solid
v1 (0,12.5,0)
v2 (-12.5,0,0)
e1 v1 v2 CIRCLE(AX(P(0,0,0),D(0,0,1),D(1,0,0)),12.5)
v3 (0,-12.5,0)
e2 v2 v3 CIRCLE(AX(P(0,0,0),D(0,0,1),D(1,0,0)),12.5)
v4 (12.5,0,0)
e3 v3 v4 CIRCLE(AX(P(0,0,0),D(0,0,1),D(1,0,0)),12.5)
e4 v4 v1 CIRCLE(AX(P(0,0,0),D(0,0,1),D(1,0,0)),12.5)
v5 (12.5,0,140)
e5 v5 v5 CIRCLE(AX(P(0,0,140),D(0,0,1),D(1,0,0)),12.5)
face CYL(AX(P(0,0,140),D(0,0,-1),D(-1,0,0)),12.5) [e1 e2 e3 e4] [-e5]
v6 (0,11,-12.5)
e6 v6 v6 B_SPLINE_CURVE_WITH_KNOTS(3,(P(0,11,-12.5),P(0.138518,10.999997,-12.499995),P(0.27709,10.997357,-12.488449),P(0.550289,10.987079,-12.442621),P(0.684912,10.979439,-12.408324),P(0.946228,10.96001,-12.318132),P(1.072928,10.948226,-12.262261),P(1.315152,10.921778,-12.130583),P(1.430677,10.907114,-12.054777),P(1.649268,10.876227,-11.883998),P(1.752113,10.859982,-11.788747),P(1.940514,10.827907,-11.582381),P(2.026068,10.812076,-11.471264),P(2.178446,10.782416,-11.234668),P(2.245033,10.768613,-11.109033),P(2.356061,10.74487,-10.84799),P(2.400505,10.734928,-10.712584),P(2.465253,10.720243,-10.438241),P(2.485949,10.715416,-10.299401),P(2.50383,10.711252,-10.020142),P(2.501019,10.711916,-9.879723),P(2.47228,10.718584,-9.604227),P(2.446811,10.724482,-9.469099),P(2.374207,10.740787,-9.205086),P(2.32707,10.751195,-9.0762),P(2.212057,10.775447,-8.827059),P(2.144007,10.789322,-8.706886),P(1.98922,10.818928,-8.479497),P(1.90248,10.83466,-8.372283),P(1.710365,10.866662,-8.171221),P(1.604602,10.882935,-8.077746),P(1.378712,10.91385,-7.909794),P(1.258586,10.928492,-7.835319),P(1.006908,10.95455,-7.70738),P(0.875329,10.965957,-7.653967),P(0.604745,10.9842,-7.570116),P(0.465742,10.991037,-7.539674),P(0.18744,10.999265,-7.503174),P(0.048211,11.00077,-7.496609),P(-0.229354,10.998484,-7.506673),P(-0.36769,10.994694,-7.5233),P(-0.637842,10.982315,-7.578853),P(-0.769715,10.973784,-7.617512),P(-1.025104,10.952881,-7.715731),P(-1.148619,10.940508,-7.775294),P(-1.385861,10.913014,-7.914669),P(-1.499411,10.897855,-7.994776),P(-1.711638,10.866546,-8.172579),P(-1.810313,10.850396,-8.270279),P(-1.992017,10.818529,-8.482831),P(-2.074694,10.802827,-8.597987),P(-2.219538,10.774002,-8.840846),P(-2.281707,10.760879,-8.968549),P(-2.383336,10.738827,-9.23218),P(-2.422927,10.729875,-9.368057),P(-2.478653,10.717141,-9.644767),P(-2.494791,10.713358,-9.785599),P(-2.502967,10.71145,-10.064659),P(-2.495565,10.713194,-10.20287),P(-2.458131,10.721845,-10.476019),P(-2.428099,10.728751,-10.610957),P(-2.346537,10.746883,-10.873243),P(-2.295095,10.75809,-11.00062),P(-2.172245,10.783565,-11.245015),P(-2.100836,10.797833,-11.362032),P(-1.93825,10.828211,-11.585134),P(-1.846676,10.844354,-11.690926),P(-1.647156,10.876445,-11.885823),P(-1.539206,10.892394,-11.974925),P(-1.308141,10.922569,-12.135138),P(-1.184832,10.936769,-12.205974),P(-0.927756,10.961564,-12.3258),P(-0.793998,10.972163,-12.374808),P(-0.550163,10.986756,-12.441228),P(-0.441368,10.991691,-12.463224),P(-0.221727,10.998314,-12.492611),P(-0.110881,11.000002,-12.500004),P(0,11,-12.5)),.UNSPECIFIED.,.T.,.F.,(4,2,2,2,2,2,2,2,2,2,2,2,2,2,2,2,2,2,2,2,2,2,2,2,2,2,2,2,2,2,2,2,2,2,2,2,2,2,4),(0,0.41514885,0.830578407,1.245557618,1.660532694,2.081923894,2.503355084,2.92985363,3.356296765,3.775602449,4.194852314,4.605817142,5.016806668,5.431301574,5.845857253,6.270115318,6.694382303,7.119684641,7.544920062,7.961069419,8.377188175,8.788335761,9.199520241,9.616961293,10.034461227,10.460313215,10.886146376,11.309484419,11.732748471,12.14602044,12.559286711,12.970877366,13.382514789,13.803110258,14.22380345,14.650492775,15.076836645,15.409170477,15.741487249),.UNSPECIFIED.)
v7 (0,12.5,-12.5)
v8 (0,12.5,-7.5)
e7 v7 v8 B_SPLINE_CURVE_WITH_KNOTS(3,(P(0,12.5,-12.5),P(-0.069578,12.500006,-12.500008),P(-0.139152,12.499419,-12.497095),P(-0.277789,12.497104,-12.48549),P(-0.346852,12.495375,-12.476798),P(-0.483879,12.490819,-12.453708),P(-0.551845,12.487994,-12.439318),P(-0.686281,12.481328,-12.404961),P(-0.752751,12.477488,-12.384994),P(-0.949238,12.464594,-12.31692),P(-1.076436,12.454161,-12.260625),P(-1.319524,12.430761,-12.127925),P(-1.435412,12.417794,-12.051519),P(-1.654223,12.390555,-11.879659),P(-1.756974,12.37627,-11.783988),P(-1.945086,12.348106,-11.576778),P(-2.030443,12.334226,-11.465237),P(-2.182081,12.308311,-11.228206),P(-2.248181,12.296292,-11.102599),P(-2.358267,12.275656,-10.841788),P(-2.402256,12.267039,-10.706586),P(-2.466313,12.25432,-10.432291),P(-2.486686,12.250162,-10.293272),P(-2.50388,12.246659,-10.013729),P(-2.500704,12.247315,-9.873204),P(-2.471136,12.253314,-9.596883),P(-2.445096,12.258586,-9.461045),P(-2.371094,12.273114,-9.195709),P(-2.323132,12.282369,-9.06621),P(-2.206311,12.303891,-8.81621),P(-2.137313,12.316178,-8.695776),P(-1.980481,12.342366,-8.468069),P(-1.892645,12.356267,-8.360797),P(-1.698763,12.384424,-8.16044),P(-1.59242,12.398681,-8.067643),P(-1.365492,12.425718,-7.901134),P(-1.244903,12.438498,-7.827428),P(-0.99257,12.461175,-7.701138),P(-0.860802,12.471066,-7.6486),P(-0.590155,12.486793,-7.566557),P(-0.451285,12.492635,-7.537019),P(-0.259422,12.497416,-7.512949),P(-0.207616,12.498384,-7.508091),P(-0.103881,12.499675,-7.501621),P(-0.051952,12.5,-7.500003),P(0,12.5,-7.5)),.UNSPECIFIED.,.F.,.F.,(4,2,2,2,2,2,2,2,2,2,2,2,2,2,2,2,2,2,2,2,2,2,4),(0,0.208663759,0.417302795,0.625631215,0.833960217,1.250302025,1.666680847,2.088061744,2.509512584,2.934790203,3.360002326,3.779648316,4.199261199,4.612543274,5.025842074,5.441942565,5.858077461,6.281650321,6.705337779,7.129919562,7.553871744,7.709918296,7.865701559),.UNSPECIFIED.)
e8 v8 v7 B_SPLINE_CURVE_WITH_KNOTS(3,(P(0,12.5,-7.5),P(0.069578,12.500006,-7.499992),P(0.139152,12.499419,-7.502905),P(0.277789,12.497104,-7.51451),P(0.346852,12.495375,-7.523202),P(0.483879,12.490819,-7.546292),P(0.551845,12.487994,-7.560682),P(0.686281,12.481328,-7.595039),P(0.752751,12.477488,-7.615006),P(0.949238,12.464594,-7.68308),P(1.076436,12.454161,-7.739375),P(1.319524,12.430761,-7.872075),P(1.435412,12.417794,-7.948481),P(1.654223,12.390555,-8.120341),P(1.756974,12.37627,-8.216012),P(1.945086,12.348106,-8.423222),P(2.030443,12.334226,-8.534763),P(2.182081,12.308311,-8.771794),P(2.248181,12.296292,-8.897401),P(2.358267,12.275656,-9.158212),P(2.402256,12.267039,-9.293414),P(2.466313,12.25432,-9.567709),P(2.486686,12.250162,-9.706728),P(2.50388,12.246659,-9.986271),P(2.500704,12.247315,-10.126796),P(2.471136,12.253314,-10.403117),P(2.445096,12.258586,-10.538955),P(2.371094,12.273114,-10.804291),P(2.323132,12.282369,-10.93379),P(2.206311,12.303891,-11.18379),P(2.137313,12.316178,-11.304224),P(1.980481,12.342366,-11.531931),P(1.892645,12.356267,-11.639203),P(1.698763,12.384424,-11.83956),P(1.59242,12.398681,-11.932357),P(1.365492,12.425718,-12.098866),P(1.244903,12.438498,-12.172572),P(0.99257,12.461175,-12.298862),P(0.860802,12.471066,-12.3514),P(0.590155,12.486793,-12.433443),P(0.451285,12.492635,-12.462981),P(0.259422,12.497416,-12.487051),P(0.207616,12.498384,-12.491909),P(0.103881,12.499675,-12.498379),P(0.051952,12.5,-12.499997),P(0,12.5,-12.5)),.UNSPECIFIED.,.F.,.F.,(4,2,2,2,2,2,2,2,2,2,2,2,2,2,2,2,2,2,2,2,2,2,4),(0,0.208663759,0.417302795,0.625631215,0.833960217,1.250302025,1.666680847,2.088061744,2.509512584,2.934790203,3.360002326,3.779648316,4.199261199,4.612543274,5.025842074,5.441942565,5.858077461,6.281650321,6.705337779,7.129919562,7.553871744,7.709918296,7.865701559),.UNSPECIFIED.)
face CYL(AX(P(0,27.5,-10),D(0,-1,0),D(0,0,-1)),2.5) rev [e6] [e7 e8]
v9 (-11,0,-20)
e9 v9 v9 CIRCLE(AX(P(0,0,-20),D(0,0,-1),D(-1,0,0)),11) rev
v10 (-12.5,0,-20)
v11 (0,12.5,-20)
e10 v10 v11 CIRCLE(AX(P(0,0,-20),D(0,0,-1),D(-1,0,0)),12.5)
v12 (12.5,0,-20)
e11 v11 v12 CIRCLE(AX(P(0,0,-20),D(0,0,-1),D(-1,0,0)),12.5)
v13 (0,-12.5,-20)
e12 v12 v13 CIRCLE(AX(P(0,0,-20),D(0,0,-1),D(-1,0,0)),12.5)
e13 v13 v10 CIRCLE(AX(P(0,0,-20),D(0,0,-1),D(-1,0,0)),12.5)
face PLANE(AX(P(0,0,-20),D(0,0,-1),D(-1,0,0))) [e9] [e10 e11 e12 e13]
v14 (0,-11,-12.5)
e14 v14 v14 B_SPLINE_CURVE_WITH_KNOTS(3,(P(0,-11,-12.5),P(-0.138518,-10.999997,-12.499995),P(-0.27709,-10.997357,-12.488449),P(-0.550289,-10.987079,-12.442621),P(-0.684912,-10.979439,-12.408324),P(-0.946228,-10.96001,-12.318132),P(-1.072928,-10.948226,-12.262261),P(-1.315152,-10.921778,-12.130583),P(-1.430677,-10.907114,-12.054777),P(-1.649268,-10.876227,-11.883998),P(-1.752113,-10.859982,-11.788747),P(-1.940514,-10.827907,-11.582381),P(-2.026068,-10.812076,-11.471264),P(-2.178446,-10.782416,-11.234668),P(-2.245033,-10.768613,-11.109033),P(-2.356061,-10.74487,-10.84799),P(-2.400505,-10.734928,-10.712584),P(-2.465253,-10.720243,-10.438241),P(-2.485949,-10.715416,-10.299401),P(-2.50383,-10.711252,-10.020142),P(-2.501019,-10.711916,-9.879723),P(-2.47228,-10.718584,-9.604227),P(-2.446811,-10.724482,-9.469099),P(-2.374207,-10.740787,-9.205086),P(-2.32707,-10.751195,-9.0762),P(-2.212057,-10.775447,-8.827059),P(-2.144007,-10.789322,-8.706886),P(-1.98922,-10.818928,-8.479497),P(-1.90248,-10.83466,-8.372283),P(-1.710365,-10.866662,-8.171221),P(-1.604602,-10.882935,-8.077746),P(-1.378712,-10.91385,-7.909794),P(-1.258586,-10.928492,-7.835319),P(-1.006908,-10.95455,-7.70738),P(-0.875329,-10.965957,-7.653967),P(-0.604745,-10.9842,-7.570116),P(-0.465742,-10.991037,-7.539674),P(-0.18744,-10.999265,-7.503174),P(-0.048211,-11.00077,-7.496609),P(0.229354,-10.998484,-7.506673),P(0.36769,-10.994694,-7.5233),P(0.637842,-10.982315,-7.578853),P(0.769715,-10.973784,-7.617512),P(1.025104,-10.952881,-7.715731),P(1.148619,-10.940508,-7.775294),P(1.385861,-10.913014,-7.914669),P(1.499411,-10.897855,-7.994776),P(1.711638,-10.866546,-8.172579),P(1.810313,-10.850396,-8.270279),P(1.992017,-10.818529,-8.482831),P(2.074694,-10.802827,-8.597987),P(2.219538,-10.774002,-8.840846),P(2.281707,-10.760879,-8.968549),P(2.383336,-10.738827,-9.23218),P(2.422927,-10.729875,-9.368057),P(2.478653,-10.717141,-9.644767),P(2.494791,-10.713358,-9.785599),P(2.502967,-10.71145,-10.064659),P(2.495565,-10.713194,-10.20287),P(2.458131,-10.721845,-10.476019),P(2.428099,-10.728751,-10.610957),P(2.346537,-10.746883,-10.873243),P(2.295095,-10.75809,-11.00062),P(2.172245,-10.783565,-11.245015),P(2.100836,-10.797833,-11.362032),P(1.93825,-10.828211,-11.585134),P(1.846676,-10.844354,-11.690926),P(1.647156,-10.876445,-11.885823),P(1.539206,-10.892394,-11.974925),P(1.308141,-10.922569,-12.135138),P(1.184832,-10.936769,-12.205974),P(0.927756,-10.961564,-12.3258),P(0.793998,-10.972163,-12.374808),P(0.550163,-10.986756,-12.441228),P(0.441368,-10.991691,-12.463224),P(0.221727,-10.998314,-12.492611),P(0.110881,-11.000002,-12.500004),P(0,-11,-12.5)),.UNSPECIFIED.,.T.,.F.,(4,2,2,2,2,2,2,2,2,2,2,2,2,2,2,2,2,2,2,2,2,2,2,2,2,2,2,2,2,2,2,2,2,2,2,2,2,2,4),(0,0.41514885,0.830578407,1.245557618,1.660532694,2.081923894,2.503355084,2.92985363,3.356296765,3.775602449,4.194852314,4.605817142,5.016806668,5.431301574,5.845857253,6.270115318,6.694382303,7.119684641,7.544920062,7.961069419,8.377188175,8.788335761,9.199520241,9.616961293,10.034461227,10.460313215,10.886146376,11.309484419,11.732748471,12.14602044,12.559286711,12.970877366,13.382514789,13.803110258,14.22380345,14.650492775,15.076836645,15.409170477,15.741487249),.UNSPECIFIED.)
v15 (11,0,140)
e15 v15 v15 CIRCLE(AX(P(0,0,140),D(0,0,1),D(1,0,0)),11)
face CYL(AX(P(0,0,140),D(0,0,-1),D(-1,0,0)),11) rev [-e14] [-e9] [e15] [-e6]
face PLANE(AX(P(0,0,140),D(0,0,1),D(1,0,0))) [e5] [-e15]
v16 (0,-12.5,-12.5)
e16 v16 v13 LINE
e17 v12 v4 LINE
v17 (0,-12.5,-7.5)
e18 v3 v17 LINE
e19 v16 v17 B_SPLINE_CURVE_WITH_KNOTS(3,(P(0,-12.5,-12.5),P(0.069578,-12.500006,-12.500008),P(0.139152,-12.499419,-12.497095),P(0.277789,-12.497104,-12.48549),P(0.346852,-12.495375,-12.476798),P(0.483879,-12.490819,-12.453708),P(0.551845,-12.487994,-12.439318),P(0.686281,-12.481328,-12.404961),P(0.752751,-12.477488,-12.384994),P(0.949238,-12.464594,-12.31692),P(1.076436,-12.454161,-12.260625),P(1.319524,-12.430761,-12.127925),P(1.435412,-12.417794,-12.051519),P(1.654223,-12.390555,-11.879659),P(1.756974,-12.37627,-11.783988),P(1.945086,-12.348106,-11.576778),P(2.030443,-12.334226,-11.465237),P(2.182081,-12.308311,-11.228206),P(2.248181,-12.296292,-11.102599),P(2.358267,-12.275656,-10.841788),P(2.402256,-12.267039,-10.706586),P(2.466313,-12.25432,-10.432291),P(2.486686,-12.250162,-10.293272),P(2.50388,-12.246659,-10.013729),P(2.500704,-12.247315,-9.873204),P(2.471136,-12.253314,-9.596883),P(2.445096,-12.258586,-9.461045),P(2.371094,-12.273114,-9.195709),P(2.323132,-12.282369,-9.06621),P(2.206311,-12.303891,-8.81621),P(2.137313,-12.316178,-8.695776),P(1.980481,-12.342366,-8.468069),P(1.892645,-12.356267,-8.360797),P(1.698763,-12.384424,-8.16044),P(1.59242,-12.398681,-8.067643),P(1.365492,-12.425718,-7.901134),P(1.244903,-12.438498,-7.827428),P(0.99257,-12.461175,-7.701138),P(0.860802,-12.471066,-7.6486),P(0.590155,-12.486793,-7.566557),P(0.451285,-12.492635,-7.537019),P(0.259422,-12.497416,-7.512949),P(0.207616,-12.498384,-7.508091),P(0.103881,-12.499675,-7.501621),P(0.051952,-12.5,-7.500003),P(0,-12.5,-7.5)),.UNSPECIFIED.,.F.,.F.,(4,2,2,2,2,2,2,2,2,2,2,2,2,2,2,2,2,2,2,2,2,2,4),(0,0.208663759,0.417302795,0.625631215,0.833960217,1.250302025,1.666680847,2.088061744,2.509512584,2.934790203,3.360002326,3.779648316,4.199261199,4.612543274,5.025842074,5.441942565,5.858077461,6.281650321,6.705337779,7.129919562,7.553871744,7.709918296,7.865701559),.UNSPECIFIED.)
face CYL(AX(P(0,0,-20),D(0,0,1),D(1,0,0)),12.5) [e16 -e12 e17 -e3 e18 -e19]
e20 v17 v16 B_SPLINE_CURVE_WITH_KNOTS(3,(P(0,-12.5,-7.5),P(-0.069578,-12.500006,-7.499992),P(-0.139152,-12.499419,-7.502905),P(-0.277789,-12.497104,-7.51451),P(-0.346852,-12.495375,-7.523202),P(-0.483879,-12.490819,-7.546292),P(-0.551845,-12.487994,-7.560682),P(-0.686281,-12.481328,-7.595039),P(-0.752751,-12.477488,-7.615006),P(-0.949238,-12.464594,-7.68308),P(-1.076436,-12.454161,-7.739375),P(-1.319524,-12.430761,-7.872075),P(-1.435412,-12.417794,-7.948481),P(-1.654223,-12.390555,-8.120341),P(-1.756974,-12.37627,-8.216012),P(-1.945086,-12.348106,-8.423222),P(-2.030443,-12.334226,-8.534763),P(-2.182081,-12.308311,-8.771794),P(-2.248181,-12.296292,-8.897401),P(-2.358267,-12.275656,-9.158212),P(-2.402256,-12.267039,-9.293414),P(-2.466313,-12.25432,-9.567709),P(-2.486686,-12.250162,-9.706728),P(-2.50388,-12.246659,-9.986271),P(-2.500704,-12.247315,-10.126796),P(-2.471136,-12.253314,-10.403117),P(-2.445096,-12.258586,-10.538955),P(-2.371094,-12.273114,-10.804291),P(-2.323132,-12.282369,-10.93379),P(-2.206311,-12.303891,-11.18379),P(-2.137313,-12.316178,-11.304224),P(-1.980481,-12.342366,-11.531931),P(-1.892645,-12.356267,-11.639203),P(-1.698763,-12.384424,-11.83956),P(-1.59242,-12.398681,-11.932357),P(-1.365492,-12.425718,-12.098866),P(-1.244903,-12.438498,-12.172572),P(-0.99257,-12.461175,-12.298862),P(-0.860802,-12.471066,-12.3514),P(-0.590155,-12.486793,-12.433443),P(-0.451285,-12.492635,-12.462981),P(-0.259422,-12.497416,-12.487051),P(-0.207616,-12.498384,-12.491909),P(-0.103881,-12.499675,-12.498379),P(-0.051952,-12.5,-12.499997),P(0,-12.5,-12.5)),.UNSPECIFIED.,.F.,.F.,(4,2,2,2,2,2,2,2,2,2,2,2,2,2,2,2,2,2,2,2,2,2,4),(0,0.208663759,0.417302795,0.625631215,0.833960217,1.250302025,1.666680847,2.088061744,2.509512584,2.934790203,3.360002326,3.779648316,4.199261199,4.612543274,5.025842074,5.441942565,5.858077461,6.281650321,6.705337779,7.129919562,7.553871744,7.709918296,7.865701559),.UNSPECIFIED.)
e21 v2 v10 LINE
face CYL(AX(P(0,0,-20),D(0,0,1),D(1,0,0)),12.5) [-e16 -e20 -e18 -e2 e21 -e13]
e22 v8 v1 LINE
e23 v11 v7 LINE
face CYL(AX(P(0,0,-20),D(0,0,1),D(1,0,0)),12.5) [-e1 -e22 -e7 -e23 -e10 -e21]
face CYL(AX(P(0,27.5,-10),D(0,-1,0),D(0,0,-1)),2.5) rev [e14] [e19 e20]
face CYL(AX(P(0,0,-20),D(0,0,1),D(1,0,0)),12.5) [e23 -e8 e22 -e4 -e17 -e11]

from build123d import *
from build123d.topology import SkipClean

# Parameters (mm, degrees)
ESBO_O1_R                = 12.5
ESBO_O1_R_2              = 11
RESSALTO_EXTRUS_O1_DEPTH = 140
RESSALTO_EXTRUS_O2_START = 20
ESBO_O2_R                = 12.5
ESBO_O2_R_2              = 11
RESSALTO_EXTRUS_O2_DEPTH = 20
ESBO_O3_R                = 2.5
CORTE_EXTRUS_O1_DEPTH    = 40
FILETE1_START            = -20
FILETE1_DEPTH            = 20


with BuildPart() as part:
    # Esboço1 → Ressalto-extrusão1 (new body)
    with BuildSketch(Plane.XY):
        Circle(ESBO_O1_R)
        Circle(ESBO_O1_R_2, mode=Mode.SUBTRACT)
    extrude(amount=RESSALTO_EXTRUS_O1_DEPTH)

    # Esboço2 → Ressalto-extrusão2 (add)
    # profile 1 of 5: a face of its own
    with SkipClean():  # the faces are left unmerged after this step: merging them gives an invalid solid
        with BuildSketch(Plane(origin=(0, 0, 0), x_dir=(-1, 0, 0), z_dir=(0, 0, -1)).offset(RESSALTO_EXTRUS_O2_START)):
            with BuildLine():
                Line((12.5, 12.5), (0, 12.5))
                ThreePointArc((0, 12.5), (8.838834765, 8.838834765), (12.5, 0))
                Line((12.5, 0), (12.5, 12.5))
            make_face()
        # profile 2 of 5: a face of its own
        with BuildSketch(Plane(origin=(0, 0, 0), x_dir=(-1, 0, 0), z_dir=(0, 0, -1)).offset(RESSALTO_EXTRUS_O2_START)):
            with BuildLine():
                Line((12.5, -12.5), (12.5, 0))
                ThreePointArc((12.5, 0), (8.838834747, -8.838834783), (-5.1e-08, -12.5))
                Line((-5.1e-08, -12.5), (12.5, -12.5))
            make_face()
        # profile 3 of 5: a face of its own
        with BuildSketch(Plane(origin=(0, 0, 0), x_dir=(-1, 0, 0), z_dir=(0, 0, -1)).offset(RESSALTO_EXTRUS_O2_START)):
            with BuildLine():
                ThreePointArc((-5.1e-08, -12.5), (-8.838834783, -8.838834747), (-12.5, 0))
                Line((-12.5, 0), (-12.5, -12.5))
                Line((-12.5, -12.5), (-5.1e-08, -12.5))
            make_face()
        # profile 4 of 5: a face of its own
        with BuildSketch(Plane(origin=(0, 0, 0), x_dir=(-1, 0, 0), z_dir=(0, 0, -1)).offset(RESSALTO_EXTRUS_O2_START)):
            with BuildLine():
                ThreePointArc((-12.5, 0), (-8.838834765, 8.838834765), (0, 12.5))
                Line((0, 12.5), (-12.5, 12.5))
                Line((-12.5, 12.5), (-12.5, 0))
            make_face()
        # profile 5 of 5: a face of its own
        with BuildSketch(Plane(origin=(0, 0, 0), x_dir=(-1, 0, 0), z_dir=(0, 0, -1)).offset(RESSALTO_EXTRUS_O2_START)):
            with Locations(Location((0, 0, 0), (0, 0, 180))):
                Circle(ESBO_O2_R)
            Circle(ESBO_O2_R_2, mode=Mode.SUBTRACT)
        extrude(amount=-RESSALTO_EXTRUS_O2_DEPTH)

    # Esboço3 → Corte-extrusão1 (cut)
    with SkipClean():  # the faces are left unmerged after this step: merging them gives an invalid solid
        with BuildSketch(Plane(origin=(0, -12.5, 0), x_dir=(-1, 0, 0), z_dir=(0, -1, 0))):
            with Locations(Location((0, 10, 0), (0, 0, 90))):
                Circle(ESBO_O3_R)
        extrude(amount=-CORTE_EXTRUS_O1_DEPTH, mode=Mode.SUBTRACT)

    # Filete1: read off the stored shape, not the designer's step
    # Filete1 outline → Filete1 (cut)
    with SkipClean():  # the faces are left unmerged after this step: merging them gives an invalid solid
        with BuildSketch(Plane.XY.offset(FILETE1_START)):
            with BuildLine():
                Line((12.5, 12.5), (0, 12.5))
                ThreePointArc((0, 12.5), (8.838834765, 8.838834765), (12.5, 0))
                Line((12.5, 0), (12.5, 12.5))
            make_face()
            with BuildLine():
                ThreePointArc((-12.5, 0), (-8.838834765, 8.838834765), (0, 12.5))
                Line((0, 12.5), (-12.5, 12.5))
                Line((-12.5, 12.5), (-12.5, 0))
            make_face()
            with BuildLine():
                ThreePointArc((0, -12.5), (-8.838834765, -8.838834765), (-12.5, 0))
                Line((-12.5, 0), (-12.5, -12.5))
                Line((-12.5, -12.5), (0, -12.5))
            make_face()
            with BuildLine():
                Line((12.5, -12.5), (12.5, 0))
                ThreePointArc((12.5, 0), (8.838834765, -8.838834765), (0, -12.5))
                Line((0, -12.5), (12.5, -12.5))
            make_face()
        extrude(amount=FILETE1_DEPTH, mode=Mode.SUBTRACT)


solid = part.part
